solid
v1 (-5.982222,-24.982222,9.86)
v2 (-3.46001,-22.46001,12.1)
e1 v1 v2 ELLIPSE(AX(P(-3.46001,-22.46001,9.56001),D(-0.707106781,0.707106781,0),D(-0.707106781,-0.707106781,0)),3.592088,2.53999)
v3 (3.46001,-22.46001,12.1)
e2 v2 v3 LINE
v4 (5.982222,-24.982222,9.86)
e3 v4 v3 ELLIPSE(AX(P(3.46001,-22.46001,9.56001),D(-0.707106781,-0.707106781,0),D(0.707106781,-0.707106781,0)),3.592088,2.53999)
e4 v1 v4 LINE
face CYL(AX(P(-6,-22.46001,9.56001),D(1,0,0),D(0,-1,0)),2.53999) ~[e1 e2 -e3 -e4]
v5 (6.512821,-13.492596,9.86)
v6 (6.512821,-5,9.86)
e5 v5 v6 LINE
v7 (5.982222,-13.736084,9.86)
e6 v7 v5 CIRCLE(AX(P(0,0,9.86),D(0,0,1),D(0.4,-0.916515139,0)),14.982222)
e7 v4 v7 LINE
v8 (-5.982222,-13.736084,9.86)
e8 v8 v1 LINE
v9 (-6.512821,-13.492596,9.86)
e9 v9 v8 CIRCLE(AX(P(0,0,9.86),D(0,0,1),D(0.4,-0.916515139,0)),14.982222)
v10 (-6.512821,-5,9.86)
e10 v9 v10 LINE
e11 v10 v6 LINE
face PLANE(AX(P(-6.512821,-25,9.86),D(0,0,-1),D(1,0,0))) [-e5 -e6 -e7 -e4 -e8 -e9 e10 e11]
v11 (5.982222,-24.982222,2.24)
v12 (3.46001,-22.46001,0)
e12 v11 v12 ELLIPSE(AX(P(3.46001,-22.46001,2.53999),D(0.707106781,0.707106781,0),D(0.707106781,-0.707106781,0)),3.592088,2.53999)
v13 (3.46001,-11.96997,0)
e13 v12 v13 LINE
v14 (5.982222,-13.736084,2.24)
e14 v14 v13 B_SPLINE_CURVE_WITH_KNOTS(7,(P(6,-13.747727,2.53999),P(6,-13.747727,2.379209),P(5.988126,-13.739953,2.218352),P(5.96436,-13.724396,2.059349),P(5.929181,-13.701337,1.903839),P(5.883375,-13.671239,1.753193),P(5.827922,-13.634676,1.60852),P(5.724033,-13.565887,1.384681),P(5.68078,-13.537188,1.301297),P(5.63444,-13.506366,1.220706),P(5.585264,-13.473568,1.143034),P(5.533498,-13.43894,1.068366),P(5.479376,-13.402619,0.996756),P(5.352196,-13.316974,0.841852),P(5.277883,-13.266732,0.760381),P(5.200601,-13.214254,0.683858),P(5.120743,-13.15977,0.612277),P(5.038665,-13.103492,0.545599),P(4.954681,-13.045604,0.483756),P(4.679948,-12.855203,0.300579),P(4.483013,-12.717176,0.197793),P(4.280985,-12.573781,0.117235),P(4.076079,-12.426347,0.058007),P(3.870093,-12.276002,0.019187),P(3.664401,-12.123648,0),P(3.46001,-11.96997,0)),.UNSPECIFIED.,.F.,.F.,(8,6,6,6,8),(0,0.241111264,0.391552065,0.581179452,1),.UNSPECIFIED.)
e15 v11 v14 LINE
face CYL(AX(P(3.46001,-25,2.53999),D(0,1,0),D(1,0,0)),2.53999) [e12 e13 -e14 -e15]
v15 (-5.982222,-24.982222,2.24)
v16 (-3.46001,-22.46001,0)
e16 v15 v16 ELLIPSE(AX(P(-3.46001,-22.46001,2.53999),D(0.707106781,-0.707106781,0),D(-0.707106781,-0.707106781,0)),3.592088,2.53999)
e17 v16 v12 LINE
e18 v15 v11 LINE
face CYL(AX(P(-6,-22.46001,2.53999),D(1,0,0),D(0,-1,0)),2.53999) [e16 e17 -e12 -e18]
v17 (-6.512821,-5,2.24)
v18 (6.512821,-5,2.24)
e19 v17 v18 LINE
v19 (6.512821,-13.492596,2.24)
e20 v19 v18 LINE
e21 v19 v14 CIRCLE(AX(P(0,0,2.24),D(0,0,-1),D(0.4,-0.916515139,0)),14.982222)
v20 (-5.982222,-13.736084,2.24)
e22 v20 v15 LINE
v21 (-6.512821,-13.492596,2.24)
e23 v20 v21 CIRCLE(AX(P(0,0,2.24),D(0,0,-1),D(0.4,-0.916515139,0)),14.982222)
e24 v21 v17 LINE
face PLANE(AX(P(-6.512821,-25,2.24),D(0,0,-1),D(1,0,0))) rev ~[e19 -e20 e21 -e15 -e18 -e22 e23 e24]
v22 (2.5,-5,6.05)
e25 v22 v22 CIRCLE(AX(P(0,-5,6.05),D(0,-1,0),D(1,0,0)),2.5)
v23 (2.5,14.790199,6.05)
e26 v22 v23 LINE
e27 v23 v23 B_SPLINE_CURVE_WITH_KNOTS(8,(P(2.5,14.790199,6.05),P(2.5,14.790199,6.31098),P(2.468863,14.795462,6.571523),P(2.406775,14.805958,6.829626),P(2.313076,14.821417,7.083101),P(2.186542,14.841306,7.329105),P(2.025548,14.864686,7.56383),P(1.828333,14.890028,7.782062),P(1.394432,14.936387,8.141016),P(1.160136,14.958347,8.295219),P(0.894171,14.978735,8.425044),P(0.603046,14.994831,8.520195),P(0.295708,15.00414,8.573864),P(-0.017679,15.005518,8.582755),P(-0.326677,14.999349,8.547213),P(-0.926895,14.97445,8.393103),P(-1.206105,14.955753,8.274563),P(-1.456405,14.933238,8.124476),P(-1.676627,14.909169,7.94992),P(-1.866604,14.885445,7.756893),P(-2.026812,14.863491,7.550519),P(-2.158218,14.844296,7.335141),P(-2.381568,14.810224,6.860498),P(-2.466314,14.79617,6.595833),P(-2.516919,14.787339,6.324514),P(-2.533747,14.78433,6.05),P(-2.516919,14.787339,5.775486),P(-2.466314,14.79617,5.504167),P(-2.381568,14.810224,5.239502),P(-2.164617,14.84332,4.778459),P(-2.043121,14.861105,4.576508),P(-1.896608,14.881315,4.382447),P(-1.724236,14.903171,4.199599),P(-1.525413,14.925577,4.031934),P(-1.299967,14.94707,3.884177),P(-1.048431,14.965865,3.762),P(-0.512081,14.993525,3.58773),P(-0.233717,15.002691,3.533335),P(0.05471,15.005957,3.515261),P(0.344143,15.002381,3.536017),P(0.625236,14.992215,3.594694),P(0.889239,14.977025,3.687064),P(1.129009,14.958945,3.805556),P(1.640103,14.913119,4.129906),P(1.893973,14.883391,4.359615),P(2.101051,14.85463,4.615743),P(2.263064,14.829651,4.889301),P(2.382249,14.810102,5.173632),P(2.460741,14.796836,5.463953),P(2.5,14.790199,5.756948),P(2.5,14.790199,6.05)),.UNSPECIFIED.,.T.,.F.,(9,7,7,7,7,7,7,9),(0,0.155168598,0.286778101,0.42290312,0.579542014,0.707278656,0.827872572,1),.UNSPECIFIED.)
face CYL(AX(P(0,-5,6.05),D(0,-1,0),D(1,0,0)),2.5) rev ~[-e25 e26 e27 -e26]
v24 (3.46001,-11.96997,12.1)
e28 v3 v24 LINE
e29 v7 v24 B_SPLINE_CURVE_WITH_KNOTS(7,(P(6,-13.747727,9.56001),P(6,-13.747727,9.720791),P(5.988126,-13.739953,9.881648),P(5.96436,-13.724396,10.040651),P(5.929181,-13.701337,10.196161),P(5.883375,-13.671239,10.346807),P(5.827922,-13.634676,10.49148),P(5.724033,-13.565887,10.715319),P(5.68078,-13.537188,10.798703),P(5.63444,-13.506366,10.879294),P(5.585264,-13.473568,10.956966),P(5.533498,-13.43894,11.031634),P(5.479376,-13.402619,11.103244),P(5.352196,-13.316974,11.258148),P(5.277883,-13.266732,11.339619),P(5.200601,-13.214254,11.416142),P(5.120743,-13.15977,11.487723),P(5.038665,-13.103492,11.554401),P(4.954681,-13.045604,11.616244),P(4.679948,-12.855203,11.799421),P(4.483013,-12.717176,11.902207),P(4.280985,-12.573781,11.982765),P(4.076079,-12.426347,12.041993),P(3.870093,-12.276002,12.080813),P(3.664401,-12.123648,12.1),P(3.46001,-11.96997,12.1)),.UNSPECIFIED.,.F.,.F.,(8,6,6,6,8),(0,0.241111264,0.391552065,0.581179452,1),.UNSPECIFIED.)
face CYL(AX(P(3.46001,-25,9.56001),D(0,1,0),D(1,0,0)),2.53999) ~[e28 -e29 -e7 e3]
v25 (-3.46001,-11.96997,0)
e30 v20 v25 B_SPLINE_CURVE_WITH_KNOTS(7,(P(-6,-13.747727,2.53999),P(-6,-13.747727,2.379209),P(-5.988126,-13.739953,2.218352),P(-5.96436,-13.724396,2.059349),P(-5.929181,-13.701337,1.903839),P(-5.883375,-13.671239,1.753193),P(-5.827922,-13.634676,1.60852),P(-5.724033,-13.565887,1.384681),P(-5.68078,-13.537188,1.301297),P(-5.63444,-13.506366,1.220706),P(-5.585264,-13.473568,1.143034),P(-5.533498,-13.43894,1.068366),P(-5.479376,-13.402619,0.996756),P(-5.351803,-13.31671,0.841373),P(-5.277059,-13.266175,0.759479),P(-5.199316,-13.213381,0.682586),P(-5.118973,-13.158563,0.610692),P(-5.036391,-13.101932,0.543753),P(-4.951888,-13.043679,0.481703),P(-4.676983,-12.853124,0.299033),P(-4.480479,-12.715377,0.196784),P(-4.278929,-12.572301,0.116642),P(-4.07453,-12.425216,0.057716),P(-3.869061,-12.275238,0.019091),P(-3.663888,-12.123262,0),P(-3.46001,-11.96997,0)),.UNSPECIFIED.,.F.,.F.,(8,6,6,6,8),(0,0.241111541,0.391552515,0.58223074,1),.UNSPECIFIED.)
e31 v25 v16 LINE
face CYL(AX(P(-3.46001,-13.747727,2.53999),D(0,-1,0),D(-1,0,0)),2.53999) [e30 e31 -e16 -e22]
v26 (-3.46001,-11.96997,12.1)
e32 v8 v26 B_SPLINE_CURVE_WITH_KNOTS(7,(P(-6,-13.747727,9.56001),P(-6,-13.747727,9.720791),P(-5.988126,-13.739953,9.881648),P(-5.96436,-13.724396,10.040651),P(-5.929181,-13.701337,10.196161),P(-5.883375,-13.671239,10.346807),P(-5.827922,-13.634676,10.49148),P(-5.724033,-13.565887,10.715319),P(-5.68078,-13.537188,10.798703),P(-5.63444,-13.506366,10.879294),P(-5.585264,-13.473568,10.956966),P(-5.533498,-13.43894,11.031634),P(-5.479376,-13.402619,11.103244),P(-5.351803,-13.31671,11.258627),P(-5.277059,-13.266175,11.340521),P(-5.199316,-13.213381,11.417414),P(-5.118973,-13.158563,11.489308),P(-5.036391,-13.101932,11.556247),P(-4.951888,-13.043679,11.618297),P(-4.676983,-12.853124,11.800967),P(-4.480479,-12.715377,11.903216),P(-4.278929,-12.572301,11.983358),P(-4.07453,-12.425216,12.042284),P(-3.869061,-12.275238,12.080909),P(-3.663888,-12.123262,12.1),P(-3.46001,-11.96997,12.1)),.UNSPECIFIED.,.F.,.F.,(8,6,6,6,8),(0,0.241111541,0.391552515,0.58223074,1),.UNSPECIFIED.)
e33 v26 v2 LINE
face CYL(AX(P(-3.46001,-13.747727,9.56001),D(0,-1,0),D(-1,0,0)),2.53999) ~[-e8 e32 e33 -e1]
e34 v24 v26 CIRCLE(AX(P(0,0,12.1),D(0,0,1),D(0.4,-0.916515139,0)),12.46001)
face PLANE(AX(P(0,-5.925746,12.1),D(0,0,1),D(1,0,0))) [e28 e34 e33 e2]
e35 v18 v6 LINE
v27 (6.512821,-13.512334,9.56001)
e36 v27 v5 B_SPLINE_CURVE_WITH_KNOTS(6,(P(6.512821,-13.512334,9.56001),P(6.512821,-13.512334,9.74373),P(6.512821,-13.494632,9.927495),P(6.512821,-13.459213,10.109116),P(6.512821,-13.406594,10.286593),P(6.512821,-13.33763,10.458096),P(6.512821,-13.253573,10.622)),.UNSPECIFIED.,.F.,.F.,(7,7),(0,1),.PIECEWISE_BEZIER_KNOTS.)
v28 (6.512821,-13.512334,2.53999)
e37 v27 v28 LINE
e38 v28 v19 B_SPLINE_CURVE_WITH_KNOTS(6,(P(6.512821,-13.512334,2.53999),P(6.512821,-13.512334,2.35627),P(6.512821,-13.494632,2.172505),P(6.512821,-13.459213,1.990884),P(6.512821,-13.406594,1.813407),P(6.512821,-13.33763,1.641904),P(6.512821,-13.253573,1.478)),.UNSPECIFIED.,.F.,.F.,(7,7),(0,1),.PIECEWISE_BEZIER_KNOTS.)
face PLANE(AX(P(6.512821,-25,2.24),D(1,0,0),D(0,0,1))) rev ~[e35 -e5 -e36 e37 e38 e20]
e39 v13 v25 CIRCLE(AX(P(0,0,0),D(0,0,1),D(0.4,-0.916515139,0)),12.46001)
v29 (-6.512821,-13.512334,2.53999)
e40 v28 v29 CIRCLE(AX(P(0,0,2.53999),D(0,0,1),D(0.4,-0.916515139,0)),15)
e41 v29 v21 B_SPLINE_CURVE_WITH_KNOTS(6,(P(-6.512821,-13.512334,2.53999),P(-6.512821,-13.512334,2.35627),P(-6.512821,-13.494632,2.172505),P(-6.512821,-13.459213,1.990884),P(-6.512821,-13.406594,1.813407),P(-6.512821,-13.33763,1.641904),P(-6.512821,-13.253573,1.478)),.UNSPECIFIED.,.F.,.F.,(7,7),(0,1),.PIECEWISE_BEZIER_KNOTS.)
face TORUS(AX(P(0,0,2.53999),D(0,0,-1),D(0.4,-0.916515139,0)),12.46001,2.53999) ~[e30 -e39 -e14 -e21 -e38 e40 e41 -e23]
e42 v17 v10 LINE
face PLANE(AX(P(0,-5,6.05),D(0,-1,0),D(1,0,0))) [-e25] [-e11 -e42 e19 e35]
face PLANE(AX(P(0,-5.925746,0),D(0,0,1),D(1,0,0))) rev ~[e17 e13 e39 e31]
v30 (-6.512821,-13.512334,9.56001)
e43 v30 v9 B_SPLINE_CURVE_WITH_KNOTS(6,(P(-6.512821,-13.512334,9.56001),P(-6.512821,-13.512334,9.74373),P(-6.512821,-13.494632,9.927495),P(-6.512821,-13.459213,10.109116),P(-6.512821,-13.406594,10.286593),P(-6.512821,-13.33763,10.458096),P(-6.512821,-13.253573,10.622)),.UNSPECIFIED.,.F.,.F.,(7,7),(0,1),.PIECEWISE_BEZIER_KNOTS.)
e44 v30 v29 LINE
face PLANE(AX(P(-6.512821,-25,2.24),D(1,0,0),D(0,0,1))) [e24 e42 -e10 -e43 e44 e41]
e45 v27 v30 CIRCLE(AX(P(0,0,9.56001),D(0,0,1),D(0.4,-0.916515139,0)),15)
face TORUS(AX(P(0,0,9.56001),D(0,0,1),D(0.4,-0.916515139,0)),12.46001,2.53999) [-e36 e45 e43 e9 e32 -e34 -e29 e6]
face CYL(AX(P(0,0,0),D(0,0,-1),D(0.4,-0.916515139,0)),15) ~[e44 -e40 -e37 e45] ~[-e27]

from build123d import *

# Parameters (mm, degrees)
F1_DEPTH = 12.1
F2_R     = 2.53999
F3_W     = 13.0256410256
F3_H     = 7.62
F4_DEPTH = 20
F5_R     = 2.5
F6_DEPTH = 25.4


# Not quite as in the source:
# - a fillet or chamfer is up to 0.001 mm smaller than in the source, because OpenCascade refuses the exact size


with BuildPart() as f1:
    # F0 (on Top) → F1 (new body)
    with BuildSketch(Plane.XY):
        with BuildLine():
            Line((6, -25), (6, -13.7477270849))
            ThreePointArc((6, -13.7477270849), (0, 15), (-6, -13.7477270849))
            Line((-6, -13.7477270849), (-6, -25))
            Line((-6, -25), (0, -25))
            Line((0, -25), (6, -25))
        make_face()
    extrude(amount=F1_DEPTH)

    # F2 (radius 2.54 in the source; OpenCascade refuses exactly that, so slightly less here)
    f2_edges = [f1.edges().sort_by_distance(p)[0] for p in [
        (-6, -19.373864, 12.1),
        (0, -25, 12.1),
        (6, -19.373864, 12.1),
        (0, 15, 12.1),
        (-6, -19.373864, 0),
        (0, -25, 0),
        (6, -19.373864, 0),
        (0, 15, 0),
    ]]
    fillet(f2_edges, radius=F2_R)

    # F3 (on face) → F4 (cut)
    with BuildSketch(Plane.XZ.offset(25)):
        with Locations((0, 6.05)):
            Rectangle(F3_W, F3_H)
    extrude(amount=-F4_DEPTH, mode=Mode.SUBTRACT)

    # F5 (on face) → F6 (cut)
    with BuildSketch(Plane.XZ.offset(5)):
        with Locations((0, 6.05)):
            Circle(F5_R)
    extrude(amount=-F6_DEPTH, mode=Mode.SUBTRACT)


solid = f1.part
